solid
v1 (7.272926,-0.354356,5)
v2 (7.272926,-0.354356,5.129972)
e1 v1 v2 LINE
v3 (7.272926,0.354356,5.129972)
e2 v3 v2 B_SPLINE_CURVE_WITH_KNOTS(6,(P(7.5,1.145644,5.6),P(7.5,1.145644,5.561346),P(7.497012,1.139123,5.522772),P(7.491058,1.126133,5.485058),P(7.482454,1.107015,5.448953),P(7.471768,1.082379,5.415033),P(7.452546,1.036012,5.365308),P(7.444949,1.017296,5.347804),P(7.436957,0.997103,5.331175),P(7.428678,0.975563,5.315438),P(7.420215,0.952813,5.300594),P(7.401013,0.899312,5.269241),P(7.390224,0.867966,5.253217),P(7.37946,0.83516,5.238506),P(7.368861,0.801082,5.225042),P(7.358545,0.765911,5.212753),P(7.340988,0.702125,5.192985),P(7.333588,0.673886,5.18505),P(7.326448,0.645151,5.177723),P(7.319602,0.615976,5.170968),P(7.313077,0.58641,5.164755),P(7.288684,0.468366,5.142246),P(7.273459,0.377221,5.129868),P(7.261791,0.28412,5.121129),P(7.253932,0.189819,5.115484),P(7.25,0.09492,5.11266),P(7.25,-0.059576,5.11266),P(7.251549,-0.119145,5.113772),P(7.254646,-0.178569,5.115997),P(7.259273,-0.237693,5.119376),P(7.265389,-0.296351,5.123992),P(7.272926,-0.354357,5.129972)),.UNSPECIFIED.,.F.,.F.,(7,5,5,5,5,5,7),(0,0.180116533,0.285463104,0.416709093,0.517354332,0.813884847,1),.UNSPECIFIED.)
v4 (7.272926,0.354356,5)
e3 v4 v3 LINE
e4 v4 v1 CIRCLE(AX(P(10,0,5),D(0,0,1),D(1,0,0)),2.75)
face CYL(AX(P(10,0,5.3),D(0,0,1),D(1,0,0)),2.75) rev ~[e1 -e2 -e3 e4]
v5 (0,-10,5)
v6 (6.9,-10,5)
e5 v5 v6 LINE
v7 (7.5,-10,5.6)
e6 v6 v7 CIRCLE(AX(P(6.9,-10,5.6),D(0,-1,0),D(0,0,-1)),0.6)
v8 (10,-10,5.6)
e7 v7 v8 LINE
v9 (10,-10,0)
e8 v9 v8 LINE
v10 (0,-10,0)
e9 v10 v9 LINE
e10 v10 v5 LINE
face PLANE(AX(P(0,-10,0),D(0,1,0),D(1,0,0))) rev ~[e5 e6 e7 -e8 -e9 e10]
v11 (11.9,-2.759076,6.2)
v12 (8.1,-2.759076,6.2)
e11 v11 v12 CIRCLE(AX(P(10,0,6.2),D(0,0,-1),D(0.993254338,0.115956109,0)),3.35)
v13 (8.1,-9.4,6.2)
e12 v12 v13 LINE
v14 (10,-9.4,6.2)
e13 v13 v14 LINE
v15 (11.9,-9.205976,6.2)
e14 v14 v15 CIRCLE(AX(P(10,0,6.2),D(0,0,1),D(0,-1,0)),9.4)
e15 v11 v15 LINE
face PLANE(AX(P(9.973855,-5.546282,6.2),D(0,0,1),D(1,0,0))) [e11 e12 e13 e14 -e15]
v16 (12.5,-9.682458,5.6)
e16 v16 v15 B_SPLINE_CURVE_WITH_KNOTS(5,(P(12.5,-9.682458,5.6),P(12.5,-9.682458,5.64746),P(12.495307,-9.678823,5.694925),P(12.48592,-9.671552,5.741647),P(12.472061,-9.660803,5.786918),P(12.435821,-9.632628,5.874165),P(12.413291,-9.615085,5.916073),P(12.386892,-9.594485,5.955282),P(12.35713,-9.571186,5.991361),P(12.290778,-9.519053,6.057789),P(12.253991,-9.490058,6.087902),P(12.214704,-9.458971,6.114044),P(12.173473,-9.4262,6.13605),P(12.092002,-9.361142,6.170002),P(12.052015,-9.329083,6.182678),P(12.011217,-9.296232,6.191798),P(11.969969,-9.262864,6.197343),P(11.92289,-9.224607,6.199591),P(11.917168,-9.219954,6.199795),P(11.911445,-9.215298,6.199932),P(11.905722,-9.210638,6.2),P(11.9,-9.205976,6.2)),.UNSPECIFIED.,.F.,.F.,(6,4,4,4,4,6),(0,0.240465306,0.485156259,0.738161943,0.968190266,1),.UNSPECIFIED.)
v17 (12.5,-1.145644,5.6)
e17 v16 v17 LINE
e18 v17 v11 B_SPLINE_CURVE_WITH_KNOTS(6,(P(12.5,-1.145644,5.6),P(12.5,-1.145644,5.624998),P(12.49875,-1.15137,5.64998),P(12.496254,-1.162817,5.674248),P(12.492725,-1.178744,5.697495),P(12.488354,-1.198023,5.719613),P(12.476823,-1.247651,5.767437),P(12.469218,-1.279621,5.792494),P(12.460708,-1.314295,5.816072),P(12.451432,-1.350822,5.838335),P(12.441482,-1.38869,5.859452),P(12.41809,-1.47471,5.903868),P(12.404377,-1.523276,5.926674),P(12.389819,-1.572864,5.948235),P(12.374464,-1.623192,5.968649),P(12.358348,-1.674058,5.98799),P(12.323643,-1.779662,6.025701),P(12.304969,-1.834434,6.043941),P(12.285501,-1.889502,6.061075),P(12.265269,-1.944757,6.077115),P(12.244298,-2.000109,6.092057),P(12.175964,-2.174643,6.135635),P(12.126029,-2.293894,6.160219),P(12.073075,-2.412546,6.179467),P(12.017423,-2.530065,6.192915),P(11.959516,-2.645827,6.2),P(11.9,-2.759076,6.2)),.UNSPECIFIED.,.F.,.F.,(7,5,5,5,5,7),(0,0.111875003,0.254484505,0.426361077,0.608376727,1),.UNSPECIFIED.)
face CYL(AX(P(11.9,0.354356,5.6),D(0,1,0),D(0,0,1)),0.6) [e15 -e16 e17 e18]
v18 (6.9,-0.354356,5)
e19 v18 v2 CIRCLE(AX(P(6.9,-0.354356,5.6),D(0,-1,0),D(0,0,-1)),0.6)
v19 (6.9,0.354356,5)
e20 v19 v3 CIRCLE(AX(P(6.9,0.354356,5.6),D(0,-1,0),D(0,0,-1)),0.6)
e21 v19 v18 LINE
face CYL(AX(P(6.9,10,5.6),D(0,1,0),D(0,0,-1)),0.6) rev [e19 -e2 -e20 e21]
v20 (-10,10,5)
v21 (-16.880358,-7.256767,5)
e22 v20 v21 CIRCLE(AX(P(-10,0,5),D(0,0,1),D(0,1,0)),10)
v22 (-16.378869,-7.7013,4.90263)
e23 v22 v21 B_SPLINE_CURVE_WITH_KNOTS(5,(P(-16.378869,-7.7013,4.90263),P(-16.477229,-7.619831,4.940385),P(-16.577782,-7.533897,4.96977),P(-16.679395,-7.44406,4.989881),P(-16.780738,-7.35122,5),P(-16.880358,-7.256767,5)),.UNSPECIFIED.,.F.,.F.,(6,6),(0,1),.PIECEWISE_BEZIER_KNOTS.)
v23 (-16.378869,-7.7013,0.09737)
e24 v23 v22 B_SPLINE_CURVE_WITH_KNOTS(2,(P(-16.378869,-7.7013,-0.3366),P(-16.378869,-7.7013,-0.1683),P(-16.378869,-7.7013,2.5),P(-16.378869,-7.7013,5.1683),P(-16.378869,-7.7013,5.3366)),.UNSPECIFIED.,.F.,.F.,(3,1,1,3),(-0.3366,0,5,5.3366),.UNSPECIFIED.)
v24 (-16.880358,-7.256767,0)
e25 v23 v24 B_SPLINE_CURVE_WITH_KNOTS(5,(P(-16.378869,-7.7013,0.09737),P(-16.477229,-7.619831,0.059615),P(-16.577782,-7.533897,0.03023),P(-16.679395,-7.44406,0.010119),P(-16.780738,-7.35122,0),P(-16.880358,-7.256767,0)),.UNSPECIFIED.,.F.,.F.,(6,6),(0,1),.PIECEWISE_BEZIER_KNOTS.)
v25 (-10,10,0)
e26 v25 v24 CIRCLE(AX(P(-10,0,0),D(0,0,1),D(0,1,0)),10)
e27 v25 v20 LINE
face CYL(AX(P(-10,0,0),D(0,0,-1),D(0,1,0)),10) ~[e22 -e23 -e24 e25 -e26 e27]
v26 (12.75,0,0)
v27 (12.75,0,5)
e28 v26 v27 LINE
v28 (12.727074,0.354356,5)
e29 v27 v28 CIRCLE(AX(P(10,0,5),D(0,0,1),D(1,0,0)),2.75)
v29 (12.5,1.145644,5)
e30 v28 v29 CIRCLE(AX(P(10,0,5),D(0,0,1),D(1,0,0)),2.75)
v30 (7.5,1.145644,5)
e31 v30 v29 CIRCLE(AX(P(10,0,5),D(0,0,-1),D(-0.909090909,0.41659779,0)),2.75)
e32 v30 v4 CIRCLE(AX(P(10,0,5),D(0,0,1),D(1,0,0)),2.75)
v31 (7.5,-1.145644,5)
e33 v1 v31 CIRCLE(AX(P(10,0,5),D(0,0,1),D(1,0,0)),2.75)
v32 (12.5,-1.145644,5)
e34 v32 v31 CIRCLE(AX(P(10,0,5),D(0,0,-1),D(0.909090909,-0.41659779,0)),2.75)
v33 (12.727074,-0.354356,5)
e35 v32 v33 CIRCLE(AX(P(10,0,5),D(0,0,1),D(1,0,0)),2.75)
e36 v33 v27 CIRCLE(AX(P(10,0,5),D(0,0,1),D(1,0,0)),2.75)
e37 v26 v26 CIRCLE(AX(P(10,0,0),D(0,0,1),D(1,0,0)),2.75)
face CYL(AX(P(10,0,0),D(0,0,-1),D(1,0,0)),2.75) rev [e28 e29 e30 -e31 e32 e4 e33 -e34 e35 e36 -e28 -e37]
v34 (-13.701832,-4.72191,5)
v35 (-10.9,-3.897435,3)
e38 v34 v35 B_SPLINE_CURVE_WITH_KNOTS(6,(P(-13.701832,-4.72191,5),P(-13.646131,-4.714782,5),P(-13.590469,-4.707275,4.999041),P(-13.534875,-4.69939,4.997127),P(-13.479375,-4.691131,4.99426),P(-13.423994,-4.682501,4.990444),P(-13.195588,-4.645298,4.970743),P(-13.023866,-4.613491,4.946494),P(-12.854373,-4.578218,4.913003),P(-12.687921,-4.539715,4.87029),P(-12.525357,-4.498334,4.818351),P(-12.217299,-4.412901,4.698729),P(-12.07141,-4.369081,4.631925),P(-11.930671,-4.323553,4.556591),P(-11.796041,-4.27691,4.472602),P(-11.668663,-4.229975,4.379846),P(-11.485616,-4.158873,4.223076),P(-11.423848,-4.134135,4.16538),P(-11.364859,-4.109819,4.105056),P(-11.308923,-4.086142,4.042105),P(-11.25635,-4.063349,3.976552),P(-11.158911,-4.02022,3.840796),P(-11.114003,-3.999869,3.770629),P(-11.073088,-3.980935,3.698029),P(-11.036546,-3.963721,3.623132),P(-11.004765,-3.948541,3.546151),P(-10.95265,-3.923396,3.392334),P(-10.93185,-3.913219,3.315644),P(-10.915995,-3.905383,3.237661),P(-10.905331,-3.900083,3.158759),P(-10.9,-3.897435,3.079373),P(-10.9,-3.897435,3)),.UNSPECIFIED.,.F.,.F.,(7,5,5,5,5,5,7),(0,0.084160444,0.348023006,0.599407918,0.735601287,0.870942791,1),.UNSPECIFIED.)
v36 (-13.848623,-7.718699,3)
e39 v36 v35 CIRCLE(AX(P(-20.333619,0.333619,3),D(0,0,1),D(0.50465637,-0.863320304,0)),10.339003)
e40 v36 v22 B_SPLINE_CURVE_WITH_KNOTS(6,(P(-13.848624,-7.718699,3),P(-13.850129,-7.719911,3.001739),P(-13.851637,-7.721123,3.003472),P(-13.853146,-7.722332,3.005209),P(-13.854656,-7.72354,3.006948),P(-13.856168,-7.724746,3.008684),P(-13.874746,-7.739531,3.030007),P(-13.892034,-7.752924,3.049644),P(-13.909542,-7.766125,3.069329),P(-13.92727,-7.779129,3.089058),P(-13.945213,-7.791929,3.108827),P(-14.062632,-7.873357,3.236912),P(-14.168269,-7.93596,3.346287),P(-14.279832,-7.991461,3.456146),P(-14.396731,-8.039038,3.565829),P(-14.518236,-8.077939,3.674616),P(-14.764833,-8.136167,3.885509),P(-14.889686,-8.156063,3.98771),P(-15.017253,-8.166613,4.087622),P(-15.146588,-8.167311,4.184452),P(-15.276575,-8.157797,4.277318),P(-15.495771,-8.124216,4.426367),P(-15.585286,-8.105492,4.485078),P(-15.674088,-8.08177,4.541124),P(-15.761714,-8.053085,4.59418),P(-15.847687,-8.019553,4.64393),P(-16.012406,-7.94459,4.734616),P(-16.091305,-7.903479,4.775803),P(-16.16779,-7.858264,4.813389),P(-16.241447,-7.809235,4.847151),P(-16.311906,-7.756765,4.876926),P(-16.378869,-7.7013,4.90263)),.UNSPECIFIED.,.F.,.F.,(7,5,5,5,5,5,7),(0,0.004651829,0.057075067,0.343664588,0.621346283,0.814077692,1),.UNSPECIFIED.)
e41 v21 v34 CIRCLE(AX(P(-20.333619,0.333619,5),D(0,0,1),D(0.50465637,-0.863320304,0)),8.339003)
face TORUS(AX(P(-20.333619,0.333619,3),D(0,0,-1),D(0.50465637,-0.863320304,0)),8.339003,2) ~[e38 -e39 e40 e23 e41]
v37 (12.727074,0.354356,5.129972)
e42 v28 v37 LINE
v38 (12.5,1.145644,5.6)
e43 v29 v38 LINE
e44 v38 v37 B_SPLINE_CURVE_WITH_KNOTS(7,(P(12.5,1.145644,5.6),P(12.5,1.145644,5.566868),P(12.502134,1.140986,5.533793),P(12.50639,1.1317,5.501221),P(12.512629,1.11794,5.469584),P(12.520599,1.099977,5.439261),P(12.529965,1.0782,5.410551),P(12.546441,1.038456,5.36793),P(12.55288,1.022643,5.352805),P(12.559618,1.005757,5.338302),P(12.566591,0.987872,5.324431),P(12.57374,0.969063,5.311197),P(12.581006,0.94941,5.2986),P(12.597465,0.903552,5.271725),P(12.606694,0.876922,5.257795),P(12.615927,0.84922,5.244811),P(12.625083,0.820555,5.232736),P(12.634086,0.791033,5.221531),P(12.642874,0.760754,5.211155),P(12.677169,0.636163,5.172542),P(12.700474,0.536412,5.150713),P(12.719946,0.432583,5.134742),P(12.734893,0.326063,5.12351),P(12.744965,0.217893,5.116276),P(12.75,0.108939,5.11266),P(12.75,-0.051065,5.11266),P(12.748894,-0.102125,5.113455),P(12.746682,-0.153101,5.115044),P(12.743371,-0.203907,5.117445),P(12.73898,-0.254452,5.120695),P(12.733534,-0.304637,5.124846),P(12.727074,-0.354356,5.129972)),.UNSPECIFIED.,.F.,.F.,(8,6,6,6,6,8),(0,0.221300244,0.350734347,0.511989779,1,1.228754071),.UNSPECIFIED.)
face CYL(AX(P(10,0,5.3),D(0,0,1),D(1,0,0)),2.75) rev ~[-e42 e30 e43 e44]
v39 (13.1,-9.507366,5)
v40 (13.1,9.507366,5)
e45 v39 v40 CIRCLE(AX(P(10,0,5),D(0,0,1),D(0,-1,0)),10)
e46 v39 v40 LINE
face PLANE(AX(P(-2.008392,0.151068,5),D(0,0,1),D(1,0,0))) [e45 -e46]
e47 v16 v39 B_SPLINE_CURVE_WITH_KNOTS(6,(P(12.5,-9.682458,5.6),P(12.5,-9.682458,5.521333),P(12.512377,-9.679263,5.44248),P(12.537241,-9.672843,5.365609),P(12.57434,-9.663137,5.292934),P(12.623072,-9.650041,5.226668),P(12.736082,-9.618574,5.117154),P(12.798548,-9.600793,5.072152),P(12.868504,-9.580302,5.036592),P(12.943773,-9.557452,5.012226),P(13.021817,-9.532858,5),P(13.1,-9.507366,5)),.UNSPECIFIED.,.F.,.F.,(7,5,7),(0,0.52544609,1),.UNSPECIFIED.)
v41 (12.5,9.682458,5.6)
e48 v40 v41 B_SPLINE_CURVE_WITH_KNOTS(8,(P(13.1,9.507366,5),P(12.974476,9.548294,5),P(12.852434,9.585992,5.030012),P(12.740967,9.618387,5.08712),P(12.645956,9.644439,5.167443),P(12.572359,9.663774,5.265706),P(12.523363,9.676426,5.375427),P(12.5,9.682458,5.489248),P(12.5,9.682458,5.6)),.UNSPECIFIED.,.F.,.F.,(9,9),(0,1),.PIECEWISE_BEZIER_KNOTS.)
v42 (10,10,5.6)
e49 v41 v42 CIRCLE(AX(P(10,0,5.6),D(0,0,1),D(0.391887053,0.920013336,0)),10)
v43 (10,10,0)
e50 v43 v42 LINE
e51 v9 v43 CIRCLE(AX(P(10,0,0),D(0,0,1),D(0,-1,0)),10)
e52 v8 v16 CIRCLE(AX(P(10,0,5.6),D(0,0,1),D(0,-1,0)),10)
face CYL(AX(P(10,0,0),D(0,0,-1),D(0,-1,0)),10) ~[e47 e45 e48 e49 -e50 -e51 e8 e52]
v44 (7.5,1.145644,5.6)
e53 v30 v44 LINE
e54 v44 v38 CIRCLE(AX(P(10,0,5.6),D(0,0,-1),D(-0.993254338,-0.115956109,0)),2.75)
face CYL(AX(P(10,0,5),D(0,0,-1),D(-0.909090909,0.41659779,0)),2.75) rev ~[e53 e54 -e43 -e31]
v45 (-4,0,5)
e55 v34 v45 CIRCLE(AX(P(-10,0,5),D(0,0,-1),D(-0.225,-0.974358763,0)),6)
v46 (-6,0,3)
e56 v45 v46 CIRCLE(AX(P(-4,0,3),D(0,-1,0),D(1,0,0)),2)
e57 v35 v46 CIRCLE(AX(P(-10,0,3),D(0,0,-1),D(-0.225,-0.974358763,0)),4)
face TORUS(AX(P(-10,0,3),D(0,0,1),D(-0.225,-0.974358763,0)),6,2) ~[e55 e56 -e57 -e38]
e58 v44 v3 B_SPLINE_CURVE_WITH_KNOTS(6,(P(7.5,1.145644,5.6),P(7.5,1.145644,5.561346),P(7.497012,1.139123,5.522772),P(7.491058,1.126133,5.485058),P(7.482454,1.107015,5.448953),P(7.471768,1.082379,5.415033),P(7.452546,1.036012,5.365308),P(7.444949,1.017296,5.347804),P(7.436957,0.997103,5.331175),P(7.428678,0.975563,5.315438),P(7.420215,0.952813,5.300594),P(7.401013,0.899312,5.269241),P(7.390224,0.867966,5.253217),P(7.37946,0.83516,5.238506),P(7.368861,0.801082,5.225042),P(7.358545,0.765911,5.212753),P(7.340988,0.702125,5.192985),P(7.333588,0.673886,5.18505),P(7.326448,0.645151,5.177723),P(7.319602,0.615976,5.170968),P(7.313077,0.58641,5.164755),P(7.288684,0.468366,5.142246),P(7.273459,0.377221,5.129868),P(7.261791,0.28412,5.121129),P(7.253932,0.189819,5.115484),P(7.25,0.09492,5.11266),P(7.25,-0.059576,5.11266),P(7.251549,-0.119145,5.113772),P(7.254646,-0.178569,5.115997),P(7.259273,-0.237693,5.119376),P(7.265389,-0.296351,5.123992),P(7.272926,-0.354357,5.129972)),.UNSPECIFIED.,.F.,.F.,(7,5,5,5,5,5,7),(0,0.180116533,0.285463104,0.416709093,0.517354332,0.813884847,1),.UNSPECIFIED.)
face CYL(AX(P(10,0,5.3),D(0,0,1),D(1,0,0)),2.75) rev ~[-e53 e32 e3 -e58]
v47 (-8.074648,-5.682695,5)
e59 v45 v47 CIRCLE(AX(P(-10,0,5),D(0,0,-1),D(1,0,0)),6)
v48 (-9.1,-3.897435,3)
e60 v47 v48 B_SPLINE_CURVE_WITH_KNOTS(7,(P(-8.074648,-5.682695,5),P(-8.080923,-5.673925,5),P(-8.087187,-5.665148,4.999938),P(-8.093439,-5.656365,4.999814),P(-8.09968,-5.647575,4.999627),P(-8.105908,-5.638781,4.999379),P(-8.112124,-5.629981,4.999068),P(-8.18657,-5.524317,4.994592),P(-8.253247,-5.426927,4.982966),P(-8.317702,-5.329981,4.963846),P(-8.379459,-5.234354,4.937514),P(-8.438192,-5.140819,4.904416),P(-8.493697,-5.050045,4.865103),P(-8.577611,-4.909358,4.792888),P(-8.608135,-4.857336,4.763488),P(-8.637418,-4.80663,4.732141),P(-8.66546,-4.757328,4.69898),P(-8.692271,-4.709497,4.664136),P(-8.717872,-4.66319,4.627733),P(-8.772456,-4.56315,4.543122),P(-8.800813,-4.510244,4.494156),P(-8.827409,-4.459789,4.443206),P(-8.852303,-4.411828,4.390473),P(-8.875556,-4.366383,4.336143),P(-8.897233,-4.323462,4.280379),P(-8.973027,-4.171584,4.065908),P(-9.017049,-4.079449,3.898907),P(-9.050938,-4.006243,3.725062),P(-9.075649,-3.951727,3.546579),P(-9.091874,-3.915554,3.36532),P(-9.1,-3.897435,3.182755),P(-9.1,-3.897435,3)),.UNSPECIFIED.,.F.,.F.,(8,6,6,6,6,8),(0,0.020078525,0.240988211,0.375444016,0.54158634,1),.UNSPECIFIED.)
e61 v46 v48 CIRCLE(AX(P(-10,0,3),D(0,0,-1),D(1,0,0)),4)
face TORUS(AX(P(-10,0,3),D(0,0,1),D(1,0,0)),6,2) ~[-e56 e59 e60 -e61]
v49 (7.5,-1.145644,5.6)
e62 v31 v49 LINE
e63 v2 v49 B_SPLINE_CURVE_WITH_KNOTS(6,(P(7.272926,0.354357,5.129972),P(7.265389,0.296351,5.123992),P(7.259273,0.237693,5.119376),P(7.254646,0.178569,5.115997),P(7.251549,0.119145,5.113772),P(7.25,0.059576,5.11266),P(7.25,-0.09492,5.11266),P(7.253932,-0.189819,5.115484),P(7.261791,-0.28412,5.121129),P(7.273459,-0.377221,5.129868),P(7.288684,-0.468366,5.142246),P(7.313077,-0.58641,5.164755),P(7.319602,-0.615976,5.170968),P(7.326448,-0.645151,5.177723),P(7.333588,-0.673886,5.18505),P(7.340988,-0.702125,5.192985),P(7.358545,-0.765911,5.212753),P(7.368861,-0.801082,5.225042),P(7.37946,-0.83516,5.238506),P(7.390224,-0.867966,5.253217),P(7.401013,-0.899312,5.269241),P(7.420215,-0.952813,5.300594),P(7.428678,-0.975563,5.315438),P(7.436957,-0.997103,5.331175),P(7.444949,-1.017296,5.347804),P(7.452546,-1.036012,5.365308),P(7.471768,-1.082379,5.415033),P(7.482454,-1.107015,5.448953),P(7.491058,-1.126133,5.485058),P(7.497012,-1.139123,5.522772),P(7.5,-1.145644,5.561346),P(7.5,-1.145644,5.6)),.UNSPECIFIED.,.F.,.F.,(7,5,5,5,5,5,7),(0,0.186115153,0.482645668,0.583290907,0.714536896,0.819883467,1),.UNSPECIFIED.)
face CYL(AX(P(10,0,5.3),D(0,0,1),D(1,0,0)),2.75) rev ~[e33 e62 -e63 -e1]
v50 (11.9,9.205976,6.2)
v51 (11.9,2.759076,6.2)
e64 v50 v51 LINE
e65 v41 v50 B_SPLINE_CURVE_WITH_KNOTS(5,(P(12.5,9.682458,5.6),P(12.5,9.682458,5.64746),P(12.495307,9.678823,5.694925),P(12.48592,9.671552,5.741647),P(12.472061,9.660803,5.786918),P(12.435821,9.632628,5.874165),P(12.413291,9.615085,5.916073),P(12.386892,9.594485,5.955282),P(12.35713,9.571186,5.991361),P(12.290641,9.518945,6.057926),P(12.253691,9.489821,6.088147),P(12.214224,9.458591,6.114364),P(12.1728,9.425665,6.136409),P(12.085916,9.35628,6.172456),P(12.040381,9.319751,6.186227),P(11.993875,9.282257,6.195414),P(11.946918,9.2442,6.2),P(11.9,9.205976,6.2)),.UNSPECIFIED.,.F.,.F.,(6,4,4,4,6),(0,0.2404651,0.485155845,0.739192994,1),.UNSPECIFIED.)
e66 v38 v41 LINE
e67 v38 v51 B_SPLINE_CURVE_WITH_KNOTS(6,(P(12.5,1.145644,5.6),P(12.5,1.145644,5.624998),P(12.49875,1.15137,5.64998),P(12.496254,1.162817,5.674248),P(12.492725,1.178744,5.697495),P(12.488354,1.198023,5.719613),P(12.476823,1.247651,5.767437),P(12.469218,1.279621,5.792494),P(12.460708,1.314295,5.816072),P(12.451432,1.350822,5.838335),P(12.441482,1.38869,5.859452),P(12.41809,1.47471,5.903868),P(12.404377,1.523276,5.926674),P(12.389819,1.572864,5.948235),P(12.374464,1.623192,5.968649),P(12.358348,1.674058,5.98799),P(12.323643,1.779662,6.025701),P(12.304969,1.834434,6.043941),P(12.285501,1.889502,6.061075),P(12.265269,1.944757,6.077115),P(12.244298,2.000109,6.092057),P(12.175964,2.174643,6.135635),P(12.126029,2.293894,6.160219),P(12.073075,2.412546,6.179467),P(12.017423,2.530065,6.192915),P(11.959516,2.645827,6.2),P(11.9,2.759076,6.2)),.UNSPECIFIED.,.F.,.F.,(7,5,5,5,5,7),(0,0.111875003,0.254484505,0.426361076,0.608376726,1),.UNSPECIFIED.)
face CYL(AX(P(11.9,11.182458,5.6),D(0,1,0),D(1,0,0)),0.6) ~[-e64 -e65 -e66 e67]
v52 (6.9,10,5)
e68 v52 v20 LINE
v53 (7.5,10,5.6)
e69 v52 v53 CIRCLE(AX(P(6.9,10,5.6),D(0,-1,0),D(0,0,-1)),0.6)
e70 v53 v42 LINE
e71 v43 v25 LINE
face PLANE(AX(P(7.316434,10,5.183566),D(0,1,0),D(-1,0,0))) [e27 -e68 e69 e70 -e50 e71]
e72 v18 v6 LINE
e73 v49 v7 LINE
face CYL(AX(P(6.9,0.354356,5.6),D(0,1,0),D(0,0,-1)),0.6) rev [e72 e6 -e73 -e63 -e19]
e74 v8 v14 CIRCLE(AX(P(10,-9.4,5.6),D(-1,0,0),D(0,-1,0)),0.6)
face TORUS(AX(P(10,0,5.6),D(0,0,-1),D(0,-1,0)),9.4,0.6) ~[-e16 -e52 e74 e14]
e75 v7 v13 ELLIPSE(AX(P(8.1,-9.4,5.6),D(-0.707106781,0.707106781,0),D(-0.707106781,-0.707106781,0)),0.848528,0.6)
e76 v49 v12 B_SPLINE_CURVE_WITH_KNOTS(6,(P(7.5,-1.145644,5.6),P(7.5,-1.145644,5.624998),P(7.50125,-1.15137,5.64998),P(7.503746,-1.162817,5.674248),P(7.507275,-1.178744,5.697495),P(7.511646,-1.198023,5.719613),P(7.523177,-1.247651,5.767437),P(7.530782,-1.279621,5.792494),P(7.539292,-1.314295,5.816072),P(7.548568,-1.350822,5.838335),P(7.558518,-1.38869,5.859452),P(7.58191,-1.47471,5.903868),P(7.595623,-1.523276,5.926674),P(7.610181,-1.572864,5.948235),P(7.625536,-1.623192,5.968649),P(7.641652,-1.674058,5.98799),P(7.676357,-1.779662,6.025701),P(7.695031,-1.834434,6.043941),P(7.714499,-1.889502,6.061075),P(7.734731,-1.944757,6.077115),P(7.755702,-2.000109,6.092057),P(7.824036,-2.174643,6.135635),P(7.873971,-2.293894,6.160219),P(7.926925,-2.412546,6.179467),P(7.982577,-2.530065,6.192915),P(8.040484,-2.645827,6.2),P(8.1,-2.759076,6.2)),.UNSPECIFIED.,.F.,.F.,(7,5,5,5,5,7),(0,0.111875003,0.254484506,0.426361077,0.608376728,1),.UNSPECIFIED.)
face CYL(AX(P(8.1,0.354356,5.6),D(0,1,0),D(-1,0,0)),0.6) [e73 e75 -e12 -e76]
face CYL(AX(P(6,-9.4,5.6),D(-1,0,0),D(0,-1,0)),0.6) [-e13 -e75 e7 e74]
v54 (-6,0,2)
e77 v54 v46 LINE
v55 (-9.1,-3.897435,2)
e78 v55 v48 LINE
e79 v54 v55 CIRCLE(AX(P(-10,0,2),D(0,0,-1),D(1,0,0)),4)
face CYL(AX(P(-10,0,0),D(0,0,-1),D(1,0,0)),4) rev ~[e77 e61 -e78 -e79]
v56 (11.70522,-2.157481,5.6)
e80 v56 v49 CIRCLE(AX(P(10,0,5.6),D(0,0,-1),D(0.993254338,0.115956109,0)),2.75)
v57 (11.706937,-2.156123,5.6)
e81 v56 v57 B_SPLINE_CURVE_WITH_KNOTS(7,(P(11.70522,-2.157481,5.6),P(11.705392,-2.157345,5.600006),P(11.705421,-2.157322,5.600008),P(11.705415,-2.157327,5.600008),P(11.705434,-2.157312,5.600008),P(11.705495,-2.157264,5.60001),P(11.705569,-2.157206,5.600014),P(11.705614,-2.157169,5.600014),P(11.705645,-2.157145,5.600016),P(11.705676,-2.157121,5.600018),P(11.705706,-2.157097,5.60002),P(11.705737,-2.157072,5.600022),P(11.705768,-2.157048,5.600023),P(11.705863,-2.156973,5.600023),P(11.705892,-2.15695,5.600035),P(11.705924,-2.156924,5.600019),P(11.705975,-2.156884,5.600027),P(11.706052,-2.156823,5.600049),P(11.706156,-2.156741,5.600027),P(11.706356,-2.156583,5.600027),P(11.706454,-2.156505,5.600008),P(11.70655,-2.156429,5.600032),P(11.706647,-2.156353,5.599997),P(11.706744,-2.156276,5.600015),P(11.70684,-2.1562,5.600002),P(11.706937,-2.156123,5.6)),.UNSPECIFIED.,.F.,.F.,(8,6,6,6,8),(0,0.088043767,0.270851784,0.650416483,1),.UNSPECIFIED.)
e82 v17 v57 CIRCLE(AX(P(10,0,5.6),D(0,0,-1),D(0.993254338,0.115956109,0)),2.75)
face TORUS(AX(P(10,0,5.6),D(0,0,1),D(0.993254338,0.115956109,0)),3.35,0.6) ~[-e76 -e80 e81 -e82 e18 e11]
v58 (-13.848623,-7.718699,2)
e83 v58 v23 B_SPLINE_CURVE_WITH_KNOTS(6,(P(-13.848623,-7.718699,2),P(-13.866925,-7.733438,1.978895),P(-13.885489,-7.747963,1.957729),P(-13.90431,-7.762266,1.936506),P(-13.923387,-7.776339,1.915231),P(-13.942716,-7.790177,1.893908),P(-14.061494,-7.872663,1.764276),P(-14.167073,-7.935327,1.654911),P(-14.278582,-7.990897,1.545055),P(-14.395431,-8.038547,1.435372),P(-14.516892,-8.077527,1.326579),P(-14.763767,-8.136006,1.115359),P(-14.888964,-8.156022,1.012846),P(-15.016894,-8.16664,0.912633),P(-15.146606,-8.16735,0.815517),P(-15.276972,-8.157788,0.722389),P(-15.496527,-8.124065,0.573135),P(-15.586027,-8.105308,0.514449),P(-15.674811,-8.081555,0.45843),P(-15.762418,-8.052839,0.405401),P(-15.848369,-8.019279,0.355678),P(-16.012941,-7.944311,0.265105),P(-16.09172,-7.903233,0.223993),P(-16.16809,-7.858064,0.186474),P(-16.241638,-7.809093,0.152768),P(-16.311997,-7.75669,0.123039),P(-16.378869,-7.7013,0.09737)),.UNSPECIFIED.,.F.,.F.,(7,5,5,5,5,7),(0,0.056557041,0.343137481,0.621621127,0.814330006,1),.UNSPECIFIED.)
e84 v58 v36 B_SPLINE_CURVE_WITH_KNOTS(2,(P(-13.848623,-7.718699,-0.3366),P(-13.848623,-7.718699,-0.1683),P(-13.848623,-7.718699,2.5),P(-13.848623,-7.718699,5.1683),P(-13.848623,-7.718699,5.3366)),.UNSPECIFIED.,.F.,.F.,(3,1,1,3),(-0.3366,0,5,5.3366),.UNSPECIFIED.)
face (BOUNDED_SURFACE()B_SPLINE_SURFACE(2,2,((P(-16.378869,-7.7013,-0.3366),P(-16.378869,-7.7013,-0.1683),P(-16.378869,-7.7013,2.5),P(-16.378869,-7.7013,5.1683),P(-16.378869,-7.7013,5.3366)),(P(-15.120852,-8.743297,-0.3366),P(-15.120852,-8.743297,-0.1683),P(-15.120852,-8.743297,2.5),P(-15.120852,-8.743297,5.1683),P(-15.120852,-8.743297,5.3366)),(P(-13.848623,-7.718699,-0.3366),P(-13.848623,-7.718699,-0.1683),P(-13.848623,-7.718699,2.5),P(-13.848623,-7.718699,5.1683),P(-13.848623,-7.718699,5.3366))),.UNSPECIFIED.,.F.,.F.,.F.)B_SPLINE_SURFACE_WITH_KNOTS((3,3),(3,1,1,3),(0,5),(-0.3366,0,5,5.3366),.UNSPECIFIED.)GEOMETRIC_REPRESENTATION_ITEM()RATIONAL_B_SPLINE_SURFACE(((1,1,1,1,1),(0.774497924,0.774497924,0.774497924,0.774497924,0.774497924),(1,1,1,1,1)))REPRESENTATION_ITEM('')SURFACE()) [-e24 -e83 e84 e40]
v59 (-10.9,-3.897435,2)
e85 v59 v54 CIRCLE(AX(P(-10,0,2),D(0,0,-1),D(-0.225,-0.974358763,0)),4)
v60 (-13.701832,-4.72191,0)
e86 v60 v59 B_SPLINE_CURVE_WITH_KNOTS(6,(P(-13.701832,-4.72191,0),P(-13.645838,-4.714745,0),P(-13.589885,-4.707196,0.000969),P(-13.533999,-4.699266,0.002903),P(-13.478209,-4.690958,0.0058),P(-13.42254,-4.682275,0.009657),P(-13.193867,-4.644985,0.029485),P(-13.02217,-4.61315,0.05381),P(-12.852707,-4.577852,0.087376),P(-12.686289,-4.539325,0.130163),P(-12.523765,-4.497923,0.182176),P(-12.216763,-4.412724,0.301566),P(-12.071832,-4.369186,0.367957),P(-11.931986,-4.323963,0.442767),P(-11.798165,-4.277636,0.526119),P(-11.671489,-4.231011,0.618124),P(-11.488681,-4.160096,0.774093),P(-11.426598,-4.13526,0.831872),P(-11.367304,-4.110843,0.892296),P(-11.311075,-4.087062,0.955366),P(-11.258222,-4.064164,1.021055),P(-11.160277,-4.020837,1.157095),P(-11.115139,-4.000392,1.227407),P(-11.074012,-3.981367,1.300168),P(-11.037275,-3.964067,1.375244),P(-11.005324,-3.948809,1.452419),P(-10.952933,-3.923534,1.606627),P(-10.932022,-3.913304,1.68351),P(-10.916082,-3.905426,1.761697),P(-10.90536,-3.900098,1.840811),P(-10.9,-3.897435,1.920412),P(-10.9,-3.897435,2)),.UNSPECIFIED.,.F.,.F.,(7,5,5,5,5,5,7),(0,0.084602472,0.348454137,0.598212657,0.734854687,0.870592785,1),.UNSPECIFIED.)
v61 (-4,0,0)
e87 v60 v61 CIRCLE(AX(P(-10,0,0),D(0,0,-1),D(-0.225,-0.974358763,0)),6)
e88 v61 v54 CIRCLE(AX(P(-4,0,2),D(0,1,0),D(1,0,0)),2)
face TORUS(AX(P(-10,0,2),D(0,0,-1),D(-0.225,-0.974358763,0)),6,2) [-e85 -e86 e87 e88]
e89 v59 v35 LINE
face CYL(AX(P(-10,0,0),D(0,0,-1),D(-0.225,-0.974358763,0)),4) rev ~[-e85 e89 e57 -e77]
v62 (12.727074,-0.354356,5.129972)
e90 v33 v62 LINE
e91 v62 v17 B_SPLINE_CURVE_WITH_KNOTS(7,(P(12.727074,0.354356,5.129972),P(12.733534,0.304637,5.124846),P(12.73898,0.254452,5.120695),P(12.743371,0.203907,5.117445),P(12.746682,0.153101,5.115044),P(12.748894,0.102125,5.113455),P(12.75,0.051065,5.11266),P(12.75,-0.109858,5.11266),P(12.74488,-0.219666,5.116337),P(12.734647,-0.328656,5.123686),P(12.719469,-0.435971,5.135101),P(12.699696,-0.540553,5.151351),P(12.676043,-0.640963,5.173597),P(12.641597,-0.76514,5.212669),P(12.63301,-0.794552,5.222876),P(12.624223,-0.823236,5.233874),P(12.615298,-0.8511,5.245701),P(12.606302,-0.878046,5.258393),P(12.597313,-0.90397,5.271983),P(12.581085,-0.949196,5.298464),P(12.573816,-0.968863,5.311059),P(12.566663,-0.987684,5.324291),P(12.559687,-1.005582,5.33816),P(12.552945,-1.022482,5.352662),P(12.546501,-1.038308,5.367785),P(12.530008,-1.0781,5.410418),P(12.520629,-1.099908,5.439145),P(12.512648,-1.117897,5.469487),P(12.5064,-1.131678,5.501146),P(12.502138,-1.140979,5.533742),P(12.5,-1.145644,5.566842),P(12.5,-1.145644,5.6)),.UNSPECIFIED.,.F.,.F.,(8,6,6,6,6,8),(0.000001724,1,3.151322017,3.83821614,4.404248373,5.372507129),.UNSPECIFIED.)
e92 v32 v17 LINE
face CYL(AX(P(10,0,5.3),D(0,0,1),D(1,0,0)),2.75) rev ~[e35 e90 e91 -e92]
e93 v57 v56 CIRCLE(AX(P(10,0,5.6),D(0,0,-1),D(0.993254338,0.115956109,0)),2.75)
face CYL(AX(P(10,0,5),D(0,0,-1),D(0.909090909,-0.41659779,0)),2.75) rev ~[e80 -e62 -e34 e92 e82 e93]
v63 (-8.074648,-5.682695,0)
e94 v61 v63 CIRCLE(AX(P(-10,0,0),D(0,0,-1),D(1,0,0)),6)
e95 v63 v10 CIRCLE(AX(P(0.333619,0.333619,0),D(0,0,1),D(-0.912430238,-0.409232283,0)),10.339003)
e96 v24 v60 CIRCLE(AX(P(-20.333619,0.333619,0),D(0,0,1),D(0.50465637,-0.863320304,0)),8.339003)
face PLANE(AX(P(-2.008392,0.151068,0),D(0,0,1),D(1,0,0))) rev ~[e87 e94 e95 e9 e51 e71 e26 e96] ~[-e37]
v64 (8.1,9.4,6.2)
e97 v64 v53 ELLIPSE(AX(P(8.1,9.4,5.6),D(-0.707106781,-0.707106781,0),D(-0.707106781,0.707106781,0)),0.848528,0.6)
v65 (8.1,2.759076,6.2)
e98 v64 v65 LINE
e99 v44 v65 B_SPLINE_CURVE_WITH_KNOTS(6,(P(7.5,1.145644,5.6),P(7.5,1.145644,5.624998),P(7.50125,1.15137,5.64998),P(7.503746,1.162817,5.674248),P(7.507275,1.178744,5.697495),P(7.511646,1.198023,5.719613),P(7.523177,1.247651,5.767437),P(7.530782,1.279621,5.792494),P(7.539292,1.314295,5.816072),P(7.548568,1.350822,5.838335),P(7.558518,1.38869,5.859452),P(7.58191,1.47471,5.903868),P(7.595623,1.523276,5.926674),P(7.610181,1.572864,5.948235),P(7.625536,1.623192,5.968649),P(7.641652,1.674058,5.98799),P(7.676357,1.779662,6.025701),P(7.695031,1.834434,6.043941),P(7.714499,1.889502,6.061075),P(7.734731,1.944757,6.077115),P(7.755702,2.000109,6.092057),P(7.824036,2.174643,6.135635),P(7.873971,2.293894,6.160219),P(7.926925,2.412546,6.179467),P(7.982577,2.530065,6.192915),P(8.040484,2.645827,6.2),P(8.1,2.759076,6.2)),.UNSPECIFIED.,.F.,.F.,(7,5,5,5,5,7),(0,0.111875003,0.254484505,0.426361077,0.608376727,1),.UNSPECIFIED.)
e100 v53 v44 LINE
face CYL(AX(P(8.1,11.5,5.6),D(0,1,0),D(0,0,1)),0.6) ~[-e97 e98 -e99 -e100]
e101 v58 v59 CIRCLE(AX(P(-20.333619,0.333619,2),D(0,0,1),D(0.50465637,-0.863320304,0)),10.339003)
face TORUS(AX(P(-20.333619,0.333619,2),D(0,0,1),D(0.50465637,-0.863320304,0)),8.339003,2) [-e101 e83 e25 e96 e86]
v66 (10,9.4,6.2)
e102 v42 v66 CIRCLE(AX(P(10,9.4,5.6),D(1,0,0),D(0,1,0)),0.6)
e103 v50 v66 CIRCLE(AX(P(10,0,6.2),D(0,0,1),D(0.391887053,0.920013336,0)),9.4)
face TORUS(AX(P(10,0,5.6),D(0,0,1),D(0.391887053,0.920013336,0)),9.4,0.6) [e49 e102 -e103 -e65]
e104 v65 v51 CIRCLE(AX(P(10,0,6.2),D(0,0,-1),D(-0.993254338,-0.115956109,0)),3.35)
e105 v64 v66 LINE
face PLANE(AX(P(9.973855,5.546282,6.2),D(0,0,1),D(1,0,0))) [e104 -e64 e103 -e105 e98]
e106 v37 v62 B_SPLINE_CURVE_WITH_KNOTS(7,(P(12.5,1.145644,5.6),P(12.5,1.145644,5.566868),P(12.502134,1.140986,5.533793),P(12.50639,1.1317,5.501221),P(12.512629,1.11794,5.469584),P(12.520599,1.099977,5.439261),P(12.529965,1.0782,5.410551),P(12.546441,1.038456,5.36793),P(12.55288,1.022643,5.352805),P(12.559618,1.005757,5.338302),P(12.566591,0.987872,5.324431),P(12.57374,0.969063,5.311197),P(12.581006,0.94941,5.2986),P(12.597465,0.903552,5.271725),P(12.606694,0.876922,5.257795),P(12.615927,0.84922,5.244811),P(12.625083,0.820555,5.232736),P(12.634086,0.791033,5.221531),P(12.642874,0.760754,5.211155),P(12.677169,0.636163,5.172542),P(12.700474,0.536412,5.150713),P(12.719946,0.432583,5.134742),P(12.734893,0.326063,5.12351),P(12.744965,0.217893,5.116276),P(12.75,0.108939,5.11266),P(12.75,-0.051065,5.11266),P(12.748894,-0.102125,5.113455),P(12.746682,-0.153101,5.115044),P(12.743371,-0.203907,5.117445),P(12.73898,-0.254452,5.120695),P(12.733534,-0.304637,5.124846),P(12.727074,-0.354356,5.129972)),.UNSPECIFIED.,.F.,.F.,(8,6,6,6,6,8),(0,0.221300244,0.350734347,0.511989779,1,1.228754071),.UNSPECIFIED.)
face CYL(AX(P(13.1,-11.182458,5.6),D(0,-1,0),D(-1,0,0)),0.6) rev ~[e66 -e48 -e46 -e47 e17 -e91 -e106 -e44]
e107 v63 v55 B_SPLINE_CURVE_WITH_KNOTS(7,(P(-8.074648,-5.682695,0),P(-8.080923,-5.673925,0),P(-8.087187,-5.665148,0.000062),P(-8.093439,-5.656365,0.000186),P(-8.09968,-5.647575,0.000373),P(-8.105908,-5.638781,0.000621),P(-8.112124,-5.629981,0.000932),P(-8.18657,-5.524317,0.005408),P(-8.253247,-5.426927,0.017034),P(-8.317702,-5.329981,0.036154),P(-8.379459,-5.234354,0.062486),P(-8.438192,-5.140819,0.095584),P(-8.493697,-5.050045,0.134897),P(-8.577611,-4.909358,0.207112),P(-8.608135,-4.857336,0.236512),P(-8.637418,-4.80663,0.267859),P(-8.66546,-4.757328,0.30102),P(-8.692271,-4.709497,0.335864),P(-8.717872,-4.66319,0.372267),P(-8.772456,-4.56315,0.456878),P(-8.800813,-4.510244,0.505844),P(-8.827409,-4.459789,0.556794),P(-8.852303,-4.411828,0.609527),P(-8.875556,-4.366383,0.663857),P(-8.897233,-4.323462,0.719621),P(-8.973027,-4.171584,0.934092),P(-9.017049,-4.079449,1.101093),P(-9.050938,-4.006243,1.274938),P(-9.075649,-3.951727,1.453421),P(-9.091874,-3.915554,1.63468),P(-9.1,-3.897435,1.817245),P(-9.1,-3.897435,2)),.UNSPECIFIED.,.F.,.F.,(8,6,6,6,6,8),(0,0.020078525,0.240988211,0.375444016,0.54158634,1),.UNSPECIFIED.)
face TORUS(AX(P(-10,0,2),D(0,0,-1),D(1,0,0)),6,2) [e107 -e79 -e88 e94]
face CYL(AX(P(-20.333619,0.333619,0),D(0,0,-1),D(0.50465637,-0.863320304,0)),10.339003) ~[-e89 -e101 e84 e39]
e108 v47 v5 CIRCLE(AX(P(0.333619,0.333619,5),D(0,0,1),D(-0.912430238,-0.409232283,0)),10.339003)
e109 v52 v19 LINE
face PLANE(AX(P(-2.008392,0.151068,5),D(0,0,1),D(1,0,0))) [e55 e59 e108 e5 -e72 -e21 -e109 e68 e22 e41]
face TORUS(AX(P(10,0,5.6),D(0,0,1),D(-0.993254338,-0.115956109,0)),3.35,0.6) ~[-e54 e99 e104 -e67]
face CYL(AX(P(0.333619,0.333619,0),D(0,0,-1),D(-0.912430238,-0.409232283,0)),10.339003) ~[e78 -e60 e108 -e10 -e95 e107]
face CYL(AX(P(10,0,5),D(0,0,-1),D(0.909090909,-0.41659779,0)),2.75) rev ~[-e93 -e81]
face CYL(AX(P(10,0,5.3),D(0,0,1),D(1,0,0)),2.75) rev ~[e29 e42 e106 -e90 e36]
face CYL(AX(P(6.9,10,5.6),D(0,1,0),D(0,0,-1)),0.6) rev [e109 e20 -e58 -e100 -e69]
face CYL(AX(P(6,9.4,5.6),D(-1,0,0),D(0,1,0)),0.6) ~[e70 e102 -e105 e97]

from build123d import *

# Parameters (mm, degrees)
F0_R         = 2.75
F1_DEPTH     = 5
F3_DEPTH     = 1.2
F4_T4_DEPTH  = 10.3543560763
F4_S5_R      = 2.75
F4_T6_DEPTH  = 7
F4_T10_DEPTH = 11.5368144418
F4_S11_R     = 2.75
F4_T12_DEPTH = 7
F4_S13_R     = 10
F4_T14_DEPTH = 7
F4_T18_DEPTH = 10.3543560763
F4_S19_R     = 2.75
F4_T20_DEPTH = 7
F4_T24_DEPTH = 11.5368144418
F4_S25_R     = 10
F4_T26_DEPTH = 7
F4_S27_R     = 2.75
F4_T28_DEPTH = 7
F4_T29_DEPTH = 11.5368144418
F4_T31_DEPTH = 4
F4_T33_DEPTH = 11.8543560763
F4_T35_DEPTH = 11.8543560763
F4_T37_DEPTH = 11.5368144418
F4_T40_ANGLE = 23.0719684246
F4_T42_ANGLE = 193.3175499964
F4_T44_ANGLE = 193.3175499964
F4_T46_ANGLE = 23.0719684246
F5_R         = 2


# Not quite as in the source:
# - a fillet or chamfer that OpenCascade refuses, or shapes differently, is made with other operations: its cross-section is extruded or revolved along the edge and cut away or added


with BuildPart() as f1:
    # F0 (on Top) → F1 (new body)
    with BuildSketch(Plane.XY):
        with BuildLine():
            Line((0, -10), (10, -10))
            ThreePointArc((10, -10), (20, 0), (10, 10))
            Line((10, 10), (0, 10))
            Line((0, 10), (-10, 10))
            ThreePointArc((-10, 10), (-19.6416420475, 2.6530621228), (-15.1159750636, -8.5922522745))
            ThreePointArc((-15.1159750636, -8.5922522745), (-12.6410769035, -6.5743316904), (-10.9, -3.897435054))
            ThreePointArc((-10.9, -3.897435054), (-12.4899799196, 3.1304951685), (-6, 0))
            ThreePointArc((-6, 0), (-6.8695048315, -2.4899799196), (-9.1, -3.897435054))
            ThreePointArc((-9.1, -3.897435054), (-5.4248582308, -8.2532853555), (0, -10))
        make_face()
        with Locations((10, 0)):
            Circle(F0_R, mode=Mode.SUBTRACT)
    extrude(amount=F1_DEPTH)

    # F2 (on face) → F3 (join)
    with BuildSketch(Plane.XY.offset(5)):
        with BuildLine():
            Line((10, 10), (7.5, 10))
            Line((7.5, 10), (7.5, 1.1456439237))
            ThreePointArc((7.5, 1.1456439237), (10, 2.75), (12.5, 1.1456439237))
            Line((12.5, 1.1456439237), (12.5, 9.6824583655))
            ThreePointArc((12.5, 9.6824583655), (11.2600429248, 9.9202969627), (10, 10))
        make_face()
        with BuildLine():
            ThreePointArc((12.5, -1.1456439237), (10, -2.75), (7.5, -1.1456439237))
            Line((7.5, -1.1456439237), (7.5, -10))
            Line((7.5, -10), (10, -10))
            ThreePointArc((10, -10), (11.2600429248, -9.9202969627), (12.5, -9.6824583655))
            Line((12.5, -9.6824583655), (12.5, -1.1456439237))
        make_face()
    extrude(amount=F3_DEPTH)

    # F4: fillet of radius 0.6 on 14 edges, made by hand


with BuildPart() as f4_tool2:
    # F4_s3 → F4_t4 (new body)
    with BuildSketch(Plane.XZ.offset(-10)):
        with BuildLine():
            ThreePointArc((6.9, 5), (7.3242640687, 5.1757359313), (7.5, 5.6))
            Line((7.5, 5.6), (7.5, 5))
            Line((7.5, 5), (6.9, 5))
        make_face()
    extrude(amount=F4_T4_DEPTH)

    # F4_s5 → F4_t6 (cut, symmetric)
    with BuildSketch(Plane.XY.offset(5.3)):
        with Locations((10, 0)):
            Circle(F4_S5_R)
    extrude(amount=F4_T6_DEPTH, both=True, mode=Mode.SUBTRACT)


with BuildPart() as f1_1:
    add(f1.part)

    # F4_t1: union F4_tool2
    add(f4_tool2.part)


with BuildPart() as f4_tool8:
    # F4_s9 → F4_t10 (new body)
    with BuildSketch(Plane.XZ.offset(0.3543560763)):
        with BuildLine():
            ThreePointArc((13.1, 5), (12.6757359313, 5.1757359313), (12.5, 5.6))
            Line((12.5, 5.6), (12.5, 5))
            Line((12.5, 5), (13.1, 5))
        make_face()
    extrude(amount=-F4_T10_DEPTH)

    # F4_s11 → F4_t12 (cut, symmetric)
    with BuildSketch(Plane.XY.offset(5.3)):
        with Locations((10, 0)):
            Circle(F4_S11_R)
    extrude(amount=F4_T12_DEPTH, both=True, mode=Mode.SUBTRACT)

    # F4_s13 → F4_t14 (intersect, symmetric)
    with BuildSketch(Plane.XY.offset(5.3)):
        with Locations((10, 0)):
            Circle(F4_S13_R)
    extrude(amount=F4_T14_DEPTH, both=True, mode=Mode.INTERSECT)


with BuildPart() as f1_2:
    add(f1_1.part)

    # F4_t7: union F4_tool8
    add(f4_tool8.part)


with BuildPart() as f4_tool16:
    # F4_s17 → F4_t18 (new body)
    with BuildSketch(Plane.XZ.offset(-0.3543560763)):
        with BuildLine():
            ThreePointArc((6.9, 5), (7.3242640687, 5.1757359313), (7.5, 5.6))
            Line((7.5, 5.6), (7.5, 5))
            Line((7.5, 5), (6.9, 5))
        make_face()
    extrude(amount=F4_T18_DEPTH)

    # F4_s19 → F4_t20 (cut, symmetric)
    with BuildSketch(Plane.XY.offset(5.3)):
        with Locations((10, 0)):
            Circle(F4_S19_R)
    extrude(amount=F4_T20_DEPTH, both=True, mode=Mode.SUBTRACT)


with BuildPart() as f1_3:
    add(f1_2.part)

    # F4_t15: union F4_tool16
    add(f4_tool16.part)


with BuildPart() as f4_tool22:
    # F4_s23 → F4_t24 (new body)
    with BuildSketch(Plane.XZ.offset(11.1824583655)):
        with BuildLine():
            ThreePointArc((12.5, 5.6), (12.6757359313, 5.1757359313), (13.1, 5))
            Line((13.1, 5), (12.5, 5))
            Line((12.5, 5), (12.5, 5.6))
        make_face()
    extrude(amount=-F4_T24_DEPTH)

    # F4_s25 → F4_t26 (intersect, symmetric)
    with BuildSketch(Plane.XY.offset(5.3)):
        with Locations((10, 0)):
            Circle(F4_S25_R)
    extrude(amount=F4_T26_DEPTH, both=True, mode=Mode.INTERSECT)

    # F4_s27 → F4_t28 (cut, symmetric)
    with BuildSketch(Plane.XY.offset(5.3)):
        with Locations((10, 0)):
            Circle(F4_S27_R)
    extrude(amount=F4_T28_DEPTH, both=True, mode=Mode.SUBTRACT)


with BuildPart() as f1_4:
    add(f1_3.part)

    # F4_t21: union F4_tool22
    add(f4_tool22.part)

    # F4_s30 → F4_t29 (cut)
    with BuildSketch(Plane.XZ.offset(-11.1824583655)):
        with BuildLine():
            ThreePointArc((12.5, 5.6), (12.3242640687, 6.0242640687), (11.9, 6.2))
            Line((11.9, 6.2), (12.5, 6.2))
            Line((12.5, 6.2), (12.5, 5.6))
        make_face()
    extrude(amount=F4_T29_DEPTH, mode=Mode.SUBTRACT)

    # F4_s32 → F4_t31 (cut)
    with BuildSketch(Plane.YZ.offset(6)):
        with BuildLine():
            ThreePointArc((10, 5.6), (9.8242640687, 6.0242640687), (9.4, 6.2))
            Line((9.4, 6.2), (10, 6.2))
            Line((10, 6.2), (10, 5.6))
        make_face()
        with BuildLine():
            ThreePointArc((-10, 5.6), (-9.8242640687, 6.0242640687), (-9.4, 6.2))
            Line((-9.4, 6.2), (-10, 6.2))
            Line((-10, 6.2), (-10, 5.6))
        make_face()
    extrude(amount=F4_T31_DEPTH, mode=Mode.SUBTRACT)

    # F4_s34 → F4_t33 (cut)
    with BuildSketch(Plane.XZ.offset(-11.5)):
        with BuildLine():
            ThreePointArc((8.1, 6.2), (7.6757359313, 6.0242640687), (7.5, 5.6))
            Line((7.5, 5.6), (7.5, 6.2))
            Line((7.5, 6.2), (8.1, 6.2))
        make_face()
    extrude(amount=F4_T33_DEPTH, mode=Mode.SUBTRACT)

    # F4_s36 → F4_t35 (cut)
    with BuildSketch(Plane.XZ.offset(-0.3543560763)):
        with BuildLine():
            ThreePointArc((7.5, 5.6), (7.6757359313, 6.0242640687), (8.1, 6.2))
            Line((8.1, 6.2), (7.5, 6.2))
            Line((7.5, 6.2), (7.5, 5.6))
        make_face()
    extrude(amount=F4_T35_DEPTH, mode=Mode.SUBTRACT)

    # F4_s38 → F4_t37 (cut)
    with BuildSketch(Plane.XZ.offset(-0.3543560763)):
        with BuildLine():
            ThreePointArc((11.9, 6.2), (12.3242640687, 6.0242640687), (12.5, 5.6))
            Line((12.5, 5.6), (12.5, 6.2))
            Line((12.5, 6.2), (11.9, 6.2))
        make_face()
    extrude(amount=F4_T37_DEPTH, mode=Mode.SUBTRACT)

    # F4_s39 → F4_t40 (revolve, cut)
    with BuildSketch(Plane(origin=(8.4642453755, -3.6054131494, 0), x_dir=(0, 0, 1), z_dir=(0.9200133355, -0.3918870532, 0))):
        with BuildLine():
            ThreePointArc((5.6, -13.9188705318), (6.0242640687, -13.7431346005), (6.2, -13.3188705318))
            Line((6.2, -13.3188705318), (6.2, -13.9188705318))
            Line((6.2, -13.9188705318), (5.6, -13.9188705318))
        make_face()
    revolve(axis=Axis((10, 0, 6.2), (0, 0, 1)), revolution_arc=F4_T40_ANGLE, mode=Mode.SUBTRACT)

    # F4_s41 → F4_t42 (revolve, cut)
    with BuildSketch(Plane(origin=(0.1344581916, -1.1517390808, 0), x_dir=(0, 0, 1), z_dir=(0.1159561087, -0.9932543384, 0))):
        with BuildLine():
            ThreePointArc((6.2, -6.5825433845), (6.0242640687, -7.0068074532), (5.6, -7.1825433845))
            Line((5.6, -7.1825433845), (6.2, -7.1825433845))
            Line((6.2, -7.1825433845), (6.2, -6.5825433845))
        make_face()
    revolve(axis=Axis((10, 0, 6.2), (0, 0, -1)), revolution_arc=F4_T42_ANGLE, mode=Mode.SUBTRACT)

    # F4_s43 → F4_t44 (revolve, cut)
    with BuildSketch(Plane(origin=(0.1344581916, -1.1517390808, 0), x_dir=(0, 0, 1), z_dir=(-0.1159561087, 0.9932543384, 0))):
        with BuildLine():
            ThreePointArc((6.2, 13.2825433845), (6.0242640687, 12.8582793158), (5.6, 12.6825433845))
            Line((5.6, 12.6825433845), (6.2, 12.6825433845))
            Line((6.2, 12.6825433845), (6.2, 13.2825433845))
        make_face()
    revolve(axis=Axis((10, 0, 6.2), (0, 0, -1)), revolution_arc=F4_T44_ANGLE, mode=Mode.SUBTRACT)

    # F4_s45 → F4_t46 (revolve, cut)
    with BuildSketch(Plane.YZ.offset(10)):
        with BuildLine():
            ThreePointArc((-9.4, 6.2), (-9.8242640687, 6.0242640687), (-10, 5.6))
            Line((-10, 5.6), (-10, 6.2))
            Line((-10, 6.2), (-9.4, 6.2))
        make_face()
    revolve(axis=Axis((10, 0, 6.2), (0, 0, 1)), revolution_arc=F4_T46_ANGLE, mode=Mode.SUBTRACT)

    # F5
    f5_edges = [f1_4.edges().sort_by_distance(p)[0] for p in [
        (-12.48998, 3.130495, 5),
        (-12.48998, 3.130495, 0),
        (-15.115975, -8.592252, 2.5),
        (0, -10, 2.5),
        (-12.641077, -6.574332, 0),
        (-12.641077, -6.574332, 5),
        (-6.869505, -2.48998, 5),
        (-6.869505, -2.48998, 0),
    ]]
    fillet(f5_edges, radius=F5_R)


solid = f1_4.part
